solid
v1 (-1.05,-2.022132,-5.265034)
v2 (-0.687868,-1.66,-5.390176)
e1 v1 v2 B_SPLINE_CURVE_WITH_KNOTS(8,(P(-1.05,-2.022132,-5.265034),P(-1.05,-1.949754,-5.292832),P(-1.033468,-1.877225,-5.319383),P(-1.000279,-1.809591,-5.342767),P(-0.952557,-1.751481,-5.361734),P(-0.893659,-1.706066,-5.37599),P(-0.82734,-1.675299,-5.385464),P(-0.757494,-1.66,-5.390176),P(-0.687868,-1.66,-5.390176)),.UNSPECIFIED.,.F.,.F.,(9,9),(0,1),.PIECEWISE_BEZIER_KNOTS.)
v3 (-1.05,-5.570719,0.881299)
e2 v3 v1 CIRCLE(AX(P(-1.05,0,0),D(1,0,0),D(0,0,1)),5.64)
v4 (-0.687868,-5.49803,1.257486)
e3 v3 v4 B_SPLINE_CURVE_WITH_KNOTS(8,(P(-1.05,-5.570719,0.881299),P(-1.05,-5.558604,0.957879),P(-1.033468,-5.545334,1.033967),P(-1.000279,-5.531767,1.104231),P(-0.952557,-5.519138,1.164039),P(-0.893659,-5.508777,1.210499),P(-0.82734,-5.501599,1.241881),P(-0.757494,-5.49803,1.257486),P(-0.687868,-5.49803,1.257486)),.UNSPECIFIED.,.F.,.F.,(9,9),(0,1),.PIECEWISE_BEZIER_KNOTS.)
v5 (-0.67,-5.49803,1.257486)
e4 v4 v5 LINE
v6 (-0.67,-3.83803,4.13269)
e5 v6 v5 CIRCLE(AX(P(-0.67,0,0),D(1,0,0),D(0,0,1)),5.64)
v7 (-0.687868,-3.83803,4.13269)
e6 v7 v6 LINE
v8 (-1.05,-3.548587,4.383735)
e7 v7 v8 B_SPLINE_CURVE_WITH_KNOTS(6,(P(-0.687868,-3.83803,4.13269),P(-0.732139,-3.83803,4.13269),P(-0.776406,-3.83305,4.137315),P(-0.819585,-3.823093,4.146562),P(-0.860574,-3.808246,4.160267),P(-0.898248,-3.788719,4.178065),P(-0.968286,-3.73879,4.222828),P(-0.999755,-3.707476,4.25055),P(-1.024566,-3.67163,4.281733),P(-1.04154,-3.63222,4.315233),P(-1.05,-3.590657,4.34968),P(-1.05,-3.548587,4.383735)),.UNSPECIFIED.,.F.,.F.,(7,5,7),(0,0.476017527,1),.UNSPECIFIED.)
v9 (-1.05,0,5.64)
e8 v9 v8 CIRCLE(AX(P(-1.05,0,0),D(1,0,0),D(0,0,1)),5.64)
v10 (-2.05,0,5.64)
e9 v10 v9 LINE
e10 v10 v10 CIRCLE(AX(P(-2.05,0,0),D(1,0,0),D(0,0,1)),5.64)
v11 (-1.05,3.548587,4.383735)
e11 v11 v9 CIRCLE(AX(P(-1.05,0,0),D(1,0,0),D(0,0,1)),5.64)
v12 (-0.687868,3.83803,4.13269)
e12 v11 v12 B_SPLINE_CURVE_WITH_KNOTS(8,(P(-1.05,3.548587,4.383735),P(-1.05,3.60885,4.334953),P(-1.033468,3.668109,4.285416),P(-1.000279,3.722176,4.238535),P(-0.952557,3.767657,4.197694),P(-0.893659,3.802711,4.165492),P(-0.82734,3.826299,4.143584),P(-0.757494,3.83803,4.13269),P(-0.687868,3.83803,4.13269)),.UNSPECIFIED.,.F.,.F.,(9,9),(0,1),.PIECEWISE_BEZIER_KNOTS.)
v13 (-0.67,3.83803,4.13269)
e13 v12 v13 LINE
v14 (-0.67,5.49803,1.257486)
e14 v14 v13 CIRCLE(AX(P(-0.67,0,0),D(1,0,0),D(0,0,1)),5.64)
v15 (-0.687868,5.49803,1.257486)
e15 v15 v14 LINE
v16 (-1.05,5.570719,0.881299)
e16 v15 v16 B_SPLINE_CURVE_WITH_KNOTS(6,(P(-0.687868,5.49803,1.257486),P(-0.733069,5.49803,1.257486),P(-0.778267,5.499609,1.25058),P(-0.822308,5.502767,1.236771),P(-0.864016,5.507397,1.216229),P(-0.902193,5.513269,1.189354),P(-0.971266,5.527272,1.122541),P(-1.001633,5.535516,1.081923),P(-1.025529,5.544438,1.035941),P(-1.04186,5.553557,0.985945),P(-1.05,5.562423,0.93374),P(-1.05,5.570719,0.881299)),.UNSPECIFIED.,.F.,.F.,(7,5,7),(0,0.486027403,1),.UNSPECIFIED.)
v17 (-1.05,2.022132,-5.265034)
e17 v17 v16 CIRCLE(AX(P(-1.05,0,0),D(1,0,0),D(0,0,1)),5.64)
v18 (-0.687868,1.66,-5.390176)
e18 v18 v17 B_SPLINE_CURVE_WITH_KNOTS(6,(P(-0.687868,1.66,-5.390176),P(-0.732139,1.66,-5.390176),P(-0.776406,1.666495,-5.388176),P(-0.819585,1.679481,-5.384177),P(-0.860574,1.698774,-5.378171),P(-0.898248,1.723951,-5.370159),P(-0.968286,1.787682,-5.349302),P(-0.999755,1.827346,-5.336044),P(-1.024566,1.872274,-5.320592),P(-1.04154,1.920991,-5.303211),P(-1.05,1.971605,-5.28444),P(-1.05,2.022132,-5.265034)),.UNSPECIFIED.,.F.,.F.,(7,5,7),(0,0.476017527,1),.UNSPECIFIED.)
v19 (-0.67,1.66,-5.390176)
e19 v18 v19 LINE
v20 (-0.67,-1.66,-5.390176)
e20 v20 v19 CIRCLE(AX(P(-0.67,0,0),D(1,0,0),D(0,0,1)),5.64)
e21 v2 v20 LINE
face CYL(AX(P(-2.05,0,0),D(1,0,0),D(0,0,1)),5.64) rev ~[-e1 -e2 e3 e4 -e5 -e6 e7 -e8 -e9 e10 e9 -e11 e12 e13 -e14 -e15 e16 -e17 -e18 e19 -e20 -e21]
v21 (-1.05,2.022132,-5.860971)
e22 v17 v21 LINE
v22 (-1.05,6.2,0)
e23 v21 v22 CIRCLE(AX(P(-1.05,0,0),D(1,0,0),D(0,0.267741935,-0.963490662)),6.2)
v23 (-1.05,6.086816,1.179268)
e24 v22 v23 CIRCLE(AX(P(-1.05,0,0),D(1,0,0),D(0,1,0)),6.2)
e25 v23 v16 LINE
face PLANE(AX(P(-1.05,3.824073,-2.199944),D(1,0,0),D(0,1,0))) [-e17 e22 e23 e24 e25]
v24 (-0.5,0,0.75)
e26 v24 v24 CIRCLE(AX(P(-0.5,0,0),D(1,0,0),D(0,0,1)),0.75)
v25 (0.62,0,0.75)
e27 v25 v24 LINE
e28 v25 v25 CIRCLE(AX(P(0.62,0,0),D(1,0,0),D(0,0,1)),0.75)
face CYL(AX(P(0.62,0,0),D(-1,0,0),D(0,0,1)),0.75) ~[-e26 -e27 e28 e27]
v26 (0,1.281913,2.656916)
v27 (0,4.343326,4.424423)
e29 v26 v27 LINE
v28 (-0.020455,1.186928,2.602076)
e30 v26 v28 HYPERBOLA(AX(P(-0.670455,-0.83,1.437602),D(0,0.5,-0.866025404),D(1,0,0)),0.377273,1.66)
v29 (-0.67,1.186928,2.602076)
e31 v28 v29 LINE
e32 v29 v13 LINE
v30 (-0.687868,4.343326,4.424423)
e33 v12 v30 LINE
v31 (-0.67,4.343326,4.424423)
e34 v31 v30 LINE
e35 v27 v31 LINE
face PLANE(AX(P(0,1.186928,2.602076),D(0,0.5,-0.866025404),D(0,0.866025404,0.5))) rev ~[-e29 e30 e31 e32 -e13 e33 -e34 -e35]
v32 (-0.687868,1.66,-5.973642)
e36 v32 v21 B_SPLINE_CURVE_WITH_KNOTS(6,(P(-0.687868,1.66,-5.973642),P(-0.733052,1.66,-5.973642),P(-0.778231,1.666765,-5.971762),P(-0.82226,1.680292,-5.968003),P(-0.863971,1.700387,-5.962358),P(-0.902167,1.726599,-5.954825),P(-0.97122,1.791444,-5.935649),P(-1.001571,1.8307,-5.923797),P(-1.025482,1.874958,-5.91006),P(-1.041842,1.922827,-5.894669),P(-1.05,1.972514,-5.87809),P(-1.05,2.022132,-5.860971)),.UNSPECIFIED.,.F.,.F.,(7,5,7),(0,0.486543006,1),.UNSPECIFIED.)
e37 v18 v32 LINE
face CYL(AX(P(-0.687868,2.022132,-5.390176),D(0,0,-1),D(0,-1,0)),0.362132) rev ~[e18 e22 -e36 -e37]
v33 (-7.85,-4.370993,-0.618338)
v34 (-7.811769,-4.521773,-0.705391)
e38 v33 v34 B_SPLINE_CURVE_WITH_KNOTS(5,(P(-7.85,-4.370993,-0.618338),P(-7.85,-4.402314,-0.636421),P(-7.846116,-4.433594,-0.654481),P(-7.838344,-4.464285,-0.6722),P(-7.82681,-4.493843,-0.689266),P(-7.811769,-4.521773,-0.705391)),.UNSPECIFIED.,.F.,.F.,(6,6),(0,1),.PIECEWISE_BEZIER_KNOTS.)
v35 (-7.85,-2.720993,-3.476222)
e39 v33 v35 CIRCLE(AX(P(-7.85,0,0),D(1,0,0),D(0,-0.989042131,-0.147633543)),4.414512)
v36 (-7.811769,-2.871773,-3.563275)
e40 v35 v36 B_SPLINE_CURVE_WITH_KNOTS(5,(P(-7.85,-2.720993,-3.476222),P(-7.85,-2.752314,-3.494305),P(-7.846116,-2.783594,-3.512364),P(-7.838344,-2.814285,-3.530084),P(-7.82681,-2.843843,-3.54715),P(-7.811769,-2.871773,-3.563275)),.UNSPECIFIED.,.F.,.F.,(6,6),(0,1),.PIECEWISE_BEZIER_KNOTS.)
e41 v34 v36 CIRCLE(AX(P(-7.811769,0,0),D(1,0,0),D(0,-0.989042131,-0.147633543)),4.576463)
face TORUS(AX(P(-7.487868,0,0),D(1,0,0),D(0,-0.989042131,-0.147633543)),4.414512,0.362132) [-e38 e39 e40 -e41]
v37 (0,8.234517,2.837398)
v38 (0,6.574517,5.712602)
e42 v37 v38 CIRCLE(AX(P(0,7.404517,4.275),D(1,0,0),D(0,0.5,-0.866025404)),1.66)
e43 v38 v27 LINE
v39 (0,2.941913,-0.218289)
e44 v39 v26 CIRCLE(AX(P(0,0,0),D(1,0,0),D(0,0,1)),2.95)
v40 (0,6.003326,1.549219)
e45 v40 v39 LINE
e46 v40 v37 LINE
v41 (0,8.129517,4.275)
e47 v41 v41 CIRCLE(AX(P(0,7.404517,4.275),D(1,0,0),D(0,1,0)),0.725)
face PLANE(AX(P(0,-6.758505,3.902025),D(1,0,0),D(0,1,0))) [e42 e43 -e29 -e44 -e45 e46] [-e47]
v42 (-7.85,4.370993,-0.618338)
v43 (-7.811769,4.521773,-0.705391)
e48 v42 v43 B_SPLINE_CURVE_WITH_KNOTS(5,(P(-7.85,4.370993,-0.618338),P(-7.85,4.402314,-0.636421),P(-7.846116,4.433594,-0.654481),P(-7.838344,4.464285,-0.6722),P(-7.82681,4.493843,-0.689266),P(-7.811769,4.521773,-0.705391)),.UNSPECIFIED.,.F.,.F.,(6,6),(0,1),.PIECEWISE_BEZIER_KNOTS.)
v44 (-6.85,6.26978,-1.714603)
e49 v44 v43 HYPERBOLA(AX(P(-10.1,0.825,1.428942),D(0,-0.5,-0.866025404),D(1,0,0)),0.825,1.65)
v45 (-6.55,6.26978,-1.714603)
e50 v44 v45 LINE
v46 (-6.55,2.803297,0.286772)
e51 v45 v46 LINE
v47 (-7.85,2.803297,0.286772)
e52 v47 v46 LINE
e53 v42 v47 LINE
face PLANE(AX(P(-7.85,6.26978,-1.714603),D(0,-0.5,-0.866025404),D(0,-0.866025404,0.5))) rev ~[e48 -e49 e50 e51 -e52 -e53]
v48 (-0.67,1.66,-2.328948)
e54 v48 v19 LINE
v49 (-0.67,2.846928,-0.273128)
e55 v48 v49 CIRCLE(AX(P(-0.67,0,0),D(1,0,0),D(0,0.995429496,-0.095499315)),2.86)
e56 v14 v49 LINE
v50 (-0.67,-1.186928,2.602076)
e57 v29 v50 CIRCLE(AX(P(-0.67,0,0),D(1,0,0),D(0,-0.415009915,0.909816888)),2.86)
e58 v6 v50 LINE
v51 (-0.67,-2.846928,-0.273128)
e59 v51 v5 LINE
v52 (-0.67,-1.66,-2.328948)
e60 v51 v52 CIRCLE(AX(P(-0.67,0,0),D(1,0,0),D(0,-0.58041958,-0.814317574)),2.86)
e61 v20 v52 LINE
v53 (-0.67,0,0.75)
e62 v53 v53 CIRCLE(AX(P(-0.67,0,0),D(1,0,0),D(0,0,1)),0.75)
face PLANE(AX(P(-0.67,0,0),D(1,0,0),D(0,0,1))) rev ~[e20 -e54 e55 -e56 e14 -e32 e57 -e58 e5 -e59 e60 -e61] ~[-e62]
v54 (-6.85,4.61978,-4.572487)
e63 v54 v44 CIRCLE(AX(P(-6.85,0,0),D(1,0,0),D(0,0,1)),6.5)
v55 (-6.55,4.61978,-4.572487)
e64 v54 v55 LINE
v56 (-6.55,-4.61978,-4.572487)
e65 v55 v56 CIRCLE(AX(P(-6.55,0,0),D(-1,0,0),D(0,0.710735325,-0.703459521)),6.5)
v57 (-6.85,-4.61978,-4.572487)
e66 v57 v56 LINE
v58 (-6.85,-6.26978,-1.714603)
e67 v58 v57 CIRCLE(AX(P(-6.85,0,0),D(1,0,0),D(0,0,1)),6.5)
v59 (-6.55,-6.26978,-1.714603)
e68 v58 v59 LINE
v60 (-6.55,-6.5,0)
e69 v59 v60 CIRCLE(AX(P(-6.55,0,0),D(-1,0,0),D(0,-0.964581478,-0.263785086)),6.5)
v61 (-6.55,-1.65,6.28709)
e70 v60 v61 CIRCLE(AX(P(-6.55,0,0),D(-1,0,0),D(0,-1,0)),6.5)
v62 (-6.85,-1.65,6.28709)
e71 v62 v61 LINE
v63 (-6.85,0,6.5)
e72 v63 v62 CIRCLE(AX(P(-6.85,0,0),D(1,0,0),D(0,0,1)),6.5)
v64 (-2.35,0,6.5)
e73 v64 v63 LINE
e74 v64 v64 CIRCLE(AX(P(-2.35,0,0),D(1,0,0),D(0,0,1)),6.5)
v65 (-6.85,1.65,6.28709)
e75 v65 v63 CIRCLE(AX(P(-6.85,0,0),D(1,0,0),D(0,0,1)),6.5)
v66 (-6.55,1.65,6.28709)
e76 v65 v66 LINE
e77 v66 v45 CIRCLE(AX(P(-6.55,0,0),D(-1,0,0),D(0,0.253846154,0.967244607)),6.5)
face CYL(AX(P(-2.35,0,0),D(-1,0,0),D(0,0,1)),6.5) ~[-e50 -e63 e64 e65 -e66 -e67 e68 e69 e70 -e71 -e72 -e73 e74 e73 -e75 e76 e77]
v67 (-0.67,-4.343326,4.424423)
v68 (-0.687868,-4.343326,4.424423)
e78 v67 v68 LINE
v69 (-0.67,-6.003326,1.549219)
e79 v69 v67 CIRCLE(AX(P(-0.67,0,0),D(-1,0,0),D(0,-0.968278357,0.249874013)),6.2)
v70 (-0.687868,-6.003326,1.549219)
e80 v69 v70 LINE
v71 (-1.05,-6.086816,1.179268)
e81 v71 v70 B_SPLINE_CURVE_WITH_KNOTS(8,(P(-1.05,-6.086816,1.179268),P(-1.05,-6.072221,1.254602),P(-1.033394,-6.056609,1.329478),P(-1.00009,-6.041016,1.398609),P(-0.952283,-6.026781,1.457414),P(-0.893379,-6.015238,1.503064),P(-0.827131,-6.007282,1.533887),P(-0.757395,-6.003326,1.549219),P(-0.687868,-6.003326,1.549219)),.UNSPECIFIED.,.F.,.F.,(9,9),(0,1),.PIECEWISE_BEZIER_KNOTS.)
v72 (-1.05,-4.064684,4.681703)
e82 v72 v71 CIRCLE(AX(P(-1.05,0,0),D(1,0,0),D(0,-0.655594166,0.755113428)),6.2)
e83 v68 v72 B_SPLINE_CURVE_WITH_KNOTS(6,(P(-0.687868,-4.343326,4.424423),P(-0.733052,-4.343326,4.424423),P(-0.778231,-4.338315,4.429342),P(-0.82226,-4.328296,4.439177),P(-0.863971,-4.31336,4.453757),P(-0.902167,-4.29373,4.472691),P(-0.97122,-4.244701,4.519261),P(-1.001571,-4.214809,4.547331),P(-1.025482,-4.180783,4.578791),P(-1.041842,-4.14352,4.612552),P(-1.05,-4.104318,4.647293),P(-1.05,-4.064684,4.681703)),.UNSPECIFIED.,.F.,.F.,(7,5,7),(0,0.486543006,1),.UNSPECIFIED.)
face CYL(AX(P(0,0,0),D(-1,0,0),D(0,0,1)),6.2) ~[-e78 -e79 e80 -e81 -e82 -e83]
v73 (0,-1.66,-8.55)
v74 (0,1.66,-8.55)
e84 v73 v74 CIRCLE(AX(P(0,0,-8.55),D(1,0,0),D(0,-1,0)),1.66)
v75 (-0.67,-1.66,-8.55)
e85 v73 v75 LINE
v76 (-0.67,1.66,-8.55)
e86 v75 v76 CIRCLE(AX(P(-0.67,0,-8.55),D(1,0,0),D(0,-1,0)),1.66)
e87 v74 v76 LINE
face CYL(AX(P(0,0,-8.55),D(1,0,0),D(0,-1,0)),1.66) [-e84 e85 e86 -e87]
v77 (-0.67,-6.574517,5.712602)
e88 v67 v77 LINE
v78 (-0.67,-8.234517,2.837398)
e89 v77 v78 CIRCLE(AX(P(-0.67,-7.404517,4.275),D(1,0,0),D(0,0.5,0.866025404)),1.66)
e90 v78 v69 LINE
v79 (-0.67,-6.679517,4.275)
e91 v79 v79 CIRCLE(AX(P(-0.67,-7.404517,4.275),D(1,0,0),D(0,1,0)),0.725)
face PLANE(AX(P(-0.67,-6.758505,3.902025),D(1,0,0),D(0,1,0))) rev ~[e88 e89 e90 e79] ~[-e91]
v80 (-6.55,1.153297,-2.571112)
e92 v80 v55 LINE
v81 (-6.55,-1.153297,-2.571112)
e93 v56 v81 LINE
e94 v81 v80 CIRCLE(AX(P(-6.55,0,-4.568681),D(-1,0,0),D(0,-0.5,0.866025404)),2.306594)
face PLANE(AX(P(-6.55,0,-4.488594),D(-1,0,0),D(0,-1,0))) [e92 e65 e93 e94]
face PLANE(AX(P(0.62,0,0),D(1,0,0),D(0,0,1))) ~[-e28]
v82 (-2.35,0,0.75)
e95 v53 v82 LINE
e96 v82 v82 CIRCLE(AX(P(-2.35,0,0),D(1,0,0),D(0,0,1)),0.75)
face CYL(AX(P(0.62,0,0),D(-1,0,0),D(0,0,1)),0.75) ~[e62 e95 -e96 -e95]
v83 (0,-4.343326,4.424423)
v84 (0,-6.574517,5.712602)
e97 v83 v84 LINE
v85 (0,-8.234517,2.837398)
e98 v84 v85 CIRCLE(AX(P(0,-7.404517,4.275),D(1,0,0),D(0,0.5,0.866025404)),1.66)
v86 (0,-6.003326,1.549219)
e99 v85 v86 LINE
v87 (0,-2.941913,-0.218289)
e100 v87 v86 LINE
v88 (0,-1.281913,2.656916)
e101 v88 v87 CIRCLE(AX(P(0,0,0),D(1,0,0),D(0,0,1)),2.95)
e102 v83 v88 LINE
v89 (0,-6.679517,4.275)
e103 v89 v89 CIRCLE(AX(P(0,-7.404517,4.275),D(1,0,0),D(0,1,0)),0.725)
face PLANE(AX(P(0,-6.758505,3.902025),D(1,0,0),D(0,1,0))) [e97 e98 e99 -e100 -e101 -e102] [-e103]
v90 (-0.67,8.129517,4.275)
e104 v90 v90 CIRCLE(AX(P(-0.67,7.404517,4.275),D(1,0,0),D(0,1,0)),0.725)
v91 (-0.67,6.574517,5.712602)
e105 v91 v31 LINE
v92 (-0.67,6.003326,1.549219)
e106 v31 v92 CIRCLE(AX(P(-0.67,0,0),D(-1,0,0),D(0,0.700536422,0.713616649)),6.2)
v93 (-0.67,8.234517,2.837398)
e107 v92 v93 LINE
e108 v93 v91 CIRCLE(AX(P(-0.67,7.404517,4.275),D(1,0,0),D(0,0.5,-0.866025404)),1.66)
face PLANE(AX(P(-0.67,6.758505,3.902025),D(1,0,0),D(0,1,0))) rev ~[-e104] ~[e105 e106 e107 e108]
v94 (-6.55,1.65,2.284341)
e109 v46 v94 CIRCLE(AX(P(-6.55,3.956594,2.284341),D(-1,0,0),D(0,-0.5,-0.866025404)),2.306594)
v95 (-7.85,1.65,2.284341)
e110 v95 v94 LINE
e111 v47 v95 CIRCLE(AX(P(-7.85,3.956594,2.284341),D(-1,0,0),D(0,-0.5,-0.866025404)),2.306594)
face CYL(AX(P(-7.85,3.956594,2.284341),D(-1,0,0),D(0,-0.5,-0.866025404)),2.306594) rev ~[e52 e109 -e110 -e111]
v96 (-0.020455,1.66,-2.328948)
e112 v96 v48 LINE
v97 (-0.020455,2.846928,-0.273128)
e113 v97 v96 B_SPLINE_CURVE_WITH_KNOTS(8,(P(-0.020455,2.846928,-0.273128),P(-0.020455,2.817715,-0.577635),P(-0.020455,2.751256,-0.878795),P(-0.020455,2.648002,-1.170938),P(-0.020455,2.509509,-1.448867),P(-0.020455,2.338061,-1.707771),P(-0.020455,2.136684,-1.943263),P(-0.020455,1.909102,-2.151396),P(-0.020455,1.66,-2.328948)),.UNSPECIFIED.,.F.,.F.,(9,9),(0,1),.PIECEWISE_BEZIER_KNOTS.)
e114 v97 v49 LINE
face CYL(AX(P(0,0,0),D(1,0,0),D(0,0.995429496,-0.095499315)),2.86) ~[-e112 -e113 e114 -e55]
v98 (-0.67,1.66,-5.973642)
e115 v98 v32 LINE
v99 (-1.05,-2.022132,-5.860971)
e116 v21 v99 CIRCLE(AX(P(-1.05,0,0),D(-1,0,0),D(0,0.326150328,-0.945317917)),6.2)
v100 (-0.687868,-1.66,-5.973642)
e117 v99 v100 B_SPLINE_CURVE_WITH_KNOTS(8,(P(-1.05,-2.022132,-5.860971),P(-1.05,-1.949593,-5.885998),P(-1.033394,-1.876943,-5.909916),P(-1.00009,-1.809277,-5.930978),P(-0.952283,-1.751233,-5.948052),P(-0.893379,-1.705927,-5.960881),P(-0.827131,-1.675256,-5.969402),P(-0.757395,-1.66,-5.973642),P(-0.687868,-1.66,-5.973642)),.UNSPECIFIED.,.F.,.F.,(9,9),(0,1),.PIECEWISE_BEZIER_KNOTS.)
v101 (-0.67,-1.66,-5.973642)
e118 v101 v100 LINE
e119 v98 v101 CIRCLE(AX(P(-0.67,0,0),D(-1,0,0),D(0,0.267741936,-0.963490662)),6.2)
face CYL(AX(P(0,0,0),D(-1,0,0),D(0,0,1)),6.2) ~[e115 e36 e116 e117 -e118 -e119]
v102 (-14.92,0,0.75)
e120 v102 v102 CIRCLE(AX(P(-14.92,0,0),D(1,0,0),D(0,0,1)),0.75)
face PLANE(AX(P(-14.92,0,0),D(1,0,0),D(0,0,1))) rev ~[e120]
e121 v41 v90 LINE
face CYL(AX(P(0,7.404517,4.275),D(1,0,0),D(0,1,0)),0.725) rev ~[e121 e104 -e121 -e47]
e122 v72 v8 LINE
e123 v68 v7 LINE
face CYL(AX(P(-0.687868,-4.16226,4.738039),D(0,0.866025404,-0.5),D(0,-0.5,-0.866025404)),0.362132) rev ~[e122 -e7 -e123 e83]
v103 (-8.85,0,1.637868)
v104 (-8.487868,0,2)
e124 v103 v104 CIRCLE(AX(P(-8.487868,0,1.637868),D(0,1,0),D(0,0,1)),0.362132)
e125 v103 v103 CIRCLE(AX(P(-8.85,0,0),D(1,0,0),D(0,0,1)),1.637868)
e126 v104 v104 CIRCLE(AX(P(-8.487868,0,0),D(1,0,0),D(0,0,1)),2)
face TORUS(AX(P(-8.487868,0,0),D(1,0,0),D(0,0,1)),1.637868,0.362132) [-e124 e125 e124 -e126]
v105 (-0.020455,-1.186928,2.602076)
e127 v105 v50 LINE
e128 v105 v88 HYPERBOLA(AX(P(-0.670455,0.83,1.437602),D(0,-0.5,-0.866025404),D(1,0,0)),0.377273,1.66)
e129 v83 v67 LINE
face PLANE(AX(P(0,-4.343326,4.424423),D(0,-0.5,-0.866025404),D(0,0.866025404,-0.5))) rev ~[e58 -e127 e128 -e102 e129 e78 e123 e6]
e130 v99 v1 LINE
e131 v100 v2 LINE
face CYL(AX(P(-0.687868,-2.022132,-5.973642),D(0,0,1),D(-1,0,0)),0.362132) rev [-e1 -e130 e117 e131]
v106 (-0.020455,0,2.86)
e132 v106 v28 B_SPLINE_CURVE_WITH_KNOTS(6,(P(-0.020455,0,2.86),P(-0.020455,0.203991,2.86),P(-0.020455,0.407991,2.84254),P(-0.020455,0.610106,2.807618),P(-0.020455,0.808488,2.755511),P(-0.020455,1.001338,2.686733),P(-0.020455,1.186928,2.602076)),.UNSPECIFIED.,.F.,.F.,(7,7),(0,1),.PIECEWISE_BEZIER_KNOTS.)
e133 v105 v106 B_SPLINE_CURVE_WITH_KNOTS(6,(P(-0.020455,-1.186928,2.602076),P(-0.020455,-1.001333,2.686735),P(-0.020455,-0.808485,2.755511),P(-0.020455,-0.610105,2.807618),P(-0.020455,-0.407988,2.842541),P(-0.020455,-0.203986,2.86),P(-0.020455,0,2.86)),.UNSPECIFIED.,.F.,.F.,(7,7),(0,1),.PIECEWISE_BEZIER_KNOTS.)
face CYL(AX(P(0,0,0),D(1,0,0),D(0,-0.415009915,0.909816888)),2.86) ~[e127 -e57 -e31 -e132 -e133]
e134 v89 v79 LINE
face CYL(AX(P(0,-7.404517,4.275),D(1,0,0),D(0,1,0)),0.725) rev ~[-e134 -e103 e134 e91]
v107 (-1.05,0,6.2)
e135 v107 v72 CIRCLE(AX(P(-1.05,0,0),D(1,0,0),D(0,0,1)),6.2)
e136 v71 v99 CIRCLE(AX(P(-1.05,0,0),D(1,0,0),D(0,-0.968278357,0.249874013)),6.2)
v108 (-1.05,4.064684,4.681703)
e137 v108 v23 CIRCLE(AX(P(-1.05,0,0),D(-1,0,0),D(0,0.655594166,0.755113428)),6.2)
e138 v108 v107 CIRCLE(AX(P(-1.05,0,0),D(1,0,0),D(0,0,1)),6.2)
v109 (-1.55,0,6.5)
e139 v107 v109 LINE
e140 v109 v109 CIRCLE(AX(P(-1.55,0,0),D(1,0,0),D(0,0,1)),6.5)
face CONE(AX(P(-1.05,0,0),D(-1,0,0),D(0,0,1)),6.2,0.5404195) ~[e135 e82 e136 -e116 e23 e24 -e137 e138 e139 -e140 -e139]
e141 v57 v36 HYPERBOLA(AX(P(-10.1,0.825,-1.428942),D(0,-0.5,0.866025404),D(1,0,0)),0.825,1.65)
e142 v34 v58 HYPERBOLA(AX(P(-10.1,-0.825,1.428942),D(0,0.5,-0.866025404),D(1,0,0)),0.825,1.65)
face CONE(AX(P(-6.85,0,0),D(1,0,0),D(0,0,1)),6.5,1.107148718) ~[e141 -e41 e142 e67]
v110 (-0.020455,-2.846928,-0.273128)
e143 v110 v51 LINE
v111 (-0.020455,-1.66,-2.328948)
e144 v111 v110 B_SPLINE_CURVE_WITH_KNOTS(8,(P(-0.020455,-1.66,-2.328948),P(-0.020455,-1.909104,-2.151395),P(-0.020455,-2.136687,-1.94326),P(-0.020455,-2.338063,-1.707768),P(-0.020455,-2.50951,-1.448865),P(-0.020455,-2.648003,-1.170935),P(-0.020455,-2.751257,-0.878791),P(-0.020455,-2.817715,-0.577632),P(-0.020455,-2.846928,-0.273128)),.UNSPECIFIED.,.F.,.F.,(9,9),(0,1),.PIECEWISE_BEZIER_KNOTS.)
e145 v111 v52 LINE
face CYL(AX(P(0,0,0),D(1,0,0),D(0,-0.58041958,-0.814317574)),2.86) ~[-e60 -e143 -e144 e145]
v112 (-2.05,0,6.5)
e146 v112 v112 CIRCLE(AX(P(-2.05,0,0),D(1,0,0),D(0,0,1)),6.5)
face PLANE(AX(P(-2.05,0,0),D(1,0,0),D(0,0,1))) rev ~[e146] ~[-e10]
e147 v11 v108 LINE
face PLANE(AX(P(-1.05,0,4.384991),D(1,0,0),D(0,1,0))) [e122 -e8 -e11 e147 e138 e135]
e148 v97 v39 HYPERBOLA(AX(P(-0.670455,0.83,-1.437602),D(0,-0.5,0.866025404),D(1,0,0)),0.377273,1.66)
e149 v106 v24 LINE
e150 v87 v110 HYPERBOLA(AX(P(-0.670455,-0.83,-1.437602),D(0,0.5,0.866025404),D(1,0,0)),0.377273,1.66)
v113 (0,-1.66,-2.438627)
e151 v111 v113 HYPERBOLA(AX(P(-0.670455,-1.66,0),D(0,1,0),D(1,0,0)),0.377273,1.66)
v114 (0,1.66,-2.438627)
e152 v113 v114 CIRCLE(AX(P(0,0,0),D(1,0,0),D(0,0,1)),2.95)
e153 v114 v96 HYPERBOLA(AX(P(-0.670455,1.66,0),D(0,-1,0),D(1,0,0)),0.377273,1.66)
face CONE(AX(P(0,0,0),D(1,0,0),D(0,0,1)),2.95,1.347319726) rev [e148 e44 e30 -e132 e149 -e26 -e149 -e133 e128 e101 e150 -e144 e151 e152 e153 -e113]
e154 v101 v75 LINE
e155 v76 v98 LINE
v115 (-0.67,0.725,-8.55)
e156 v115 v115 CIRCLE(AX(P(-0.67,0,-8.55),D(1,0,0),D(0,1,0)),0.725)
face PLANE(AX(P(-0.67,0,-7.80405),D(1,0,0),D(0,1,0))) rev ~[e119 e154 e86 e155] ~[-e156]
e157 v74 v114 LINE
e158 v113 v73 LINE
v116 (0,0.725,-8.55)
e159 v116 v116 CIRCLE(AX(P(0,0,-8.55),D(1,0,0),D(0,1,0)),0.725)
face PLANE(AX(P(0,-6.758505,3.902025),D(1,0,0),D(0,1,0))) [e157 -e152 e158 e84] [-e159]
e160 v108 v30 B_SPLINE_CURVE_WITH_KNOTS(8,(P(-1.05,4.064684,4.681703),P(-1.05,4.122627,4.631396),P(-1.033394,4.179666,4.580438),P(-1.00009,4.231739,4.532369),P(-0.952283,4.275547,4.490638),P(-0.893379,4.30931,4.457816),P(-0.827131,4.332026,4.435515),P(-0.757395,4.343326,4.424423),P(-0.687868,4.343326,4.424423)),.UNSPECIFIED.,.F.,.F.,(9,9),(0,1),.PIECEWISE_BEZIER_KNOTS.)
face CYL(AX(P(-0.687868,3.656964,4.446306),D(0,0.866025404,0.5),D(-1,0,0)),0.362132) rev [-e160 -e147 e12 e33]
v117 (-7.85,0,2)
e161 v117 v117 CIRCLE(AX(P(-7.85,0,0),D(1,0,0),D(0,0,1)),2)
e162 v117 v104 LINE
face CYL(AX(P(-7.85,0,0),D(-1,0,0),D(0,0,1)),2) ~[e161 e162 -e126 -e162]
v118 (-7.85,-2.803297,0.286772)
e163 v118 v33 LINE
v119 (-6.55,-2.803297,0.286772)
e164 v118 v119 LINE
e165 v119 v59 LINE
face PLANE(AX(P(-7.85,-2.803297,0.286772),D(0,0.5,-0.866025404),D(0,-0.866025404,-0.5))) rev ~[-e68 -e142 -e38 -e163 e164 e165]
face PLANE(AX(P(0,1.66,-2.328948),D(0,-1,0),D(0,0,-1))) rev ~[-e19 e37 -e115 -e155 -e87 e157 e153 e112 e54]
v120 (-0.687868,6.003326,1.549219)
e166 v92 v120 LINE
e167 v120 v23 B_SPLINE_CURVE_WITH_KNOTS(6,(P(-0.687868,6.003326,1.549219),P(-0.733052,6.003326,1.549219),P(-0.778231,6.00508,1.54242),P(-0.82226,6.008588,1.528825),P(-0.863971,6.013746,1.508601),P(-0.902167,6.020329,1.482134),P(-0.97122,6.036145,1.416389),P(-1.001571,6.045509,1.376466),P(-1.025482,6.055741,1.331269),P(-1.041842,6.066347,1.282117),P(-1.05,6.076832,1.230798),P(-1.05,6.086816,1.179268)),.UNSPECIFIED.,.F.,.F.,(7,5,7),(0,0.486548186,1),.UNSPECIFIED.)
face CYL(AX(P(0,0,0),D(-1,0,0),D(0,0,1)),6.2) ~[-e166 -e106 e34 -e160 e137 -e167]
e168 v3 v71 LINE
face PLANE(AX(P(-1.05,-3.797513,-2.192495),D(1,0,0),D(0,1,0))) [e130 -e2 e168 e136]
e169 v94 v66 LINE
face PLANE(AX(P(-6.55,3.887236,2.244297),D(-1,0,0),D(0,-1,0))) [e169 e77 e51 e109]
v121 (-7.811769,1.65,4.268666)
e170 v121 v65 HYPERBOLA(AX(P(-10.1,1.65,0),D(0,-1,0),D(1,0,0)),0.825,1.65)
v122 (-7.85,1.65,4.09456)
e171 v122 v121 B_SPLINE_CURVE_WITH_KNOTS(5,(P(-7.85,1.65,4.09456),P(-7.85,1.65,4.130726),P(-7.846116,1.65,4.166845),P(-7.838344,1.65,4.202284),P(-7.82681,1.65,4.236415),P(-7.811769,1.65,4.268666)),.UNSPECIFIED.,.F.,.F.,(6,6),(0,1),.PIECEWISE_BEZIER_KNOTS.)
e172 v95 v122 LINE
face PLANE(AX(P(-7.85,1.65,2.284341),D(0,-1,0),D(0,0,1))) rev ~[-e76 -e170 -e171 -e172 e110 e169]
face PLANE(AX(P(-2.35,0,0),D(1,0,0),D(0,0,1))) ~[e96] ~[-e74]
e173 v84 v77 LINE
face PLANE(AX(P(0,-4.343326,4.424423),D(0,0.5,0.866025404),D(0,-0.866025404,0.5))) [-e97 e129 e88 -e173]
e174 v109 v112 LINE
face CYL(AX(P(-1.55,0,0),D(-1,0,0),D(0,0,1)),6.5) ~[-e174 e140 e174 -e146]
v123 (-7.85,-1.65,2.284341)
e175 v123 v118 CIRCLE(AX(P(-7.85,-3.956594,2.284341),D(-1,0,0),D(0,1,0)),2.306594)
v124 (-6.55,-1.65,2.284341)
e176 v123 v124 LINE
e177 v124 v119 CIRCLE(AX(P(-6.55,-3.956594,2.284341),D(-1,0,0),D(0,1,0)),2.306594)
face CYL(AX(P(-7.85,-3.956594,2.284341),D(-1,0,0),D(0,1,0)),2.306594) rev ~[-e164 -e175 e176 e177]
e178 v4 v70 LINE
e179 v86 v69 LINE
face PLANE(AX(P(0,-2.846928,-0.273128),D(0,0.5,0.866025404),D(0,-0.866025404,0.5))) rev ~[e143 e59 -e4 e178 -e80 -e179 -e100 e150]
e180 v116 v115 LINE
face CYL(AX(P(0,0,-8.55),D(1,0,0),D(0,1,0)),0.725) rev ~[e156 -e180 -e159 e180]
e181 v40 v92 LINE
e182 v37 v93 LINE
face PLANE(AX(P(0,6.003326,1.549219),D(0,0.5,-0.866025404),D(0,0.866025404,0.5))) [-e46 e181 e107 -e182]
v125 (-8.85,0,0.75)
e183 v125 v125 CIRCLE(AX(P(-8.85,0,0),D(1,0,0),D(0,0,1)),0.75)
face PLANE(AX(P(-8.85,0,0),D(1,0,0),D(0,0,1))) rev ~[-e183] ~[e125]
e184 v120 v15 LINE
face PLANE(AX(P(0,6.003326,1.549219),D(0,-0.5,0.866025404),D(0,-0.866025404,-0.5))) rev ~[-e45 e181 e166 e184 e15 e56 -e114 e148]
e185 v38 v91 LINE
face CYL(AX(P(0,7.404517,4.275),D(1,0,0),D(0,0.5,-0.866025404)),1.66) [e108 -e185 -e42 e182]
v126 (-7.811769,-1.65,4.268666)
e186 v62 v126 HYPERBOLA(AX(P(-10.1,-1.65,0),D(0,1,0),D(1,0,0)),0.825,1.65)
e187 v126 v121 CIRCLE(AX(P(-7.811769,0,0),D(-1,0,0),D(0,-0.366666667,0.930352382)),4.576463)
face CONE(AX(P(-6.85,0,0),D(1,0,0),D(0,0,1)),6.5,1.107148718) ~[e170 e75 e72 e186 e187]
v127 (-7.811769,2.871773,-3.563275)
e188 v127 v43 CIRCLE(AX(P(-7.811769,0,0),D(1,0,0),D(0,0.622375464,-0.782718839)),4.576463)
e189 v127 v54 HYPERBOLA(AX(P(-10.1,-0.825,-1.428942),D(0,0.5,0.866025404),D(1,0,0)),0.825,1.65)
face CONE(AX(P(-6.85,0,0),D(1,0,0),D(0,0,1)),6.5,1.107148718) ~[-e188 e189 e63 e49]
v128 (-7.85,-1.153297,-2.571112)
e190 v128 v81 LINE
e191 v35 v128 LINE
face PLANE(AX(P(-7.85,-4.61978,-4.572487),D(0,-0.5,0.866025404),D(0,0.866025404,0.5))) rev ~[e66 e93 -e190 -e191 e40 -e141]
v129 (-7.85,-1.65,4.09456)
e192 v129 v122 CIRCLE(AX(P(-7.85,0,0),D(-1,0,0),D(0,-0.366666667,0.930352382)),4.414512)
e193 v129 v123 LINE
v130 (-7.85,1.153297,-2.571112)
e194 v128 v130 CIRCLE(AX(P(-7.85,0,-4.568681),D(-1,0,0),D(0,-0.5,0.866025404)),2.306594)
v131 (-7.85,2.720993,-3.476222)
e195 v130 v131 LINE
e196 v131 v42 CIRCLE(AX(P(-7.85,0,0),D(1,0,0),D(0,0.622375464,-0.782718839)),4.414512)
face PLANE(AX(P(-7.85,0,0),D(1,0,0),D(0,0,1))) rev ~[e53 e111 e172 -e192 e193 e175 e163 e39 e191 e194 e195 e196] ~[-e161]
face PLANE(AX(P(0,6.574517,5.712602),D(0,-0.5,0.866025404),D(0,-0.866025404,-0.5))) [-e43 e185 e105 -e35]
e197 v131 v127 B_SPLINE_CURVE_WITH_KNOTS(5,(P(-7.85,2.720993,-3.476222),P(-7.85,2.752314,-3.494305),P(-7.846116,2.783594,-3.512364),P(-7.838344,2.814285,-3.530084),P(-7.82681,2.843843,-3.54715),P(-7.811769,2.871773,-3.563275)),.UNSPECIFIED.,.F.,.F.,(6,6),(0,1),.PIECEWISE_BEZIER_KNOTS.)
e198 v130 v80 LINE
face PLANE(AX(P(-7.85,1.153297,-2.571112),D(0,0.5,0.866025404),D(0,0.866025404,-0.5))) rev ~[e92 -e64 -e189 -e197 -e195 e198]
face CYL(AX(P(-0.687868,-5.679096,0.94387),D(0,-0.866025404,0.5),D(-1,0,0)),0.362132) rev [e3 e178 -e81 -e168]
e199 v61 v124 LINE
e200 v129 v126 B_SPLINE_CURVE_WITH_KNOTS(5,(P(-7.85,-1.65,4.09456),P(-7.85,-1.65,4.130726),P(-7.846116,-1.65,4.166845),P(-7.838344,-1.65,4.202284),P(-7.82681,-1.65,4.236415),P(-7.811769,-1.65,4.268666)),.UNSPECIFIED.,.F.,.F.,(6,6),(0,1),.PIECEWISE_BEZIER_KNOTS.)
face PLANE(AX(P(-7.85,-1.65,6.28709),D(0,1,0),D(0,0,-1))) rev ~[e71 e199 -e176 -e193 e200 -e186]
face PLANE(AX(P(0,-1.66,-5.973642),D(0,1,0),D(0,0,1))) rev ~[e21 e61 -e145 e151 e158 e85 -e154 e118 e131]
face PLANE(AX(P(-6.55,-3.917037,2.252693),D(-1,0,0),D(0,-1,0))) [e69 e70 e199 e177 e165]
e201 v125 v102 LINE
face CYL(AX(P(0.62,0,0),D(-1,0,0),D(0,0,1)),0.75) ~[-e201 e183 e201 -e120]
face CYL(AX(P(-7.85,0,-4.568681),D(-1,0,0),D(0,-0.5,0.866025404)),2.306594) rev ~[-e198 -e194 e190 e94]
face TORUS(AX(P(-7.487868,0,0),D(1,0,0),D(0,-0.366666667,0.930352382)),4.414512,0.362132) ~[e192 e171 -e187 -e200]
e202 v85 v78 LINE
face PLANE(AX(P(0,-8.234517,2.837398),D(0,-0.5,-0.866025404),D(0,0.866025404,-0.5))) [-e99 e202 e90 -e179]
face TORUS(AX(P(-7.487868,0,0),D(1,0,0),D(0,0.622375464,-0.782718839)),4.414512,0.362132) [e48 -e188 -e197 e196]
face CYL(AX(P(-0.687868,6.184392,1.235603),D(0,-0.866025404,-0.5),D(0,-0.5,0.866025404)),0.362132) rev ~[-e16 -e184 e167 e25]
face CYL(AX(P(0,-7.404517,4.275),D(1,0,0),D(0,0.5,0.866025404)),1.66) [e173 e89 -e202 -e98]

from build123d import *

# Parameters (mm, degrees)
F4_DEPTH = 1.3
F6_DEPTH = 1.05
F5_R     = 0.725
F7_DEPTH = 0.67
F8_R     = 0.3621320344
F8_2_R   = 0.3621320344


# Not quite as in the source:
# - a fillet or chamfer that OpenCascade refuses, or shapes differently, is made with other operations: its cross-section is extruded or revolved along the edge and cut away or added


with BuildPart() as f1:
    # F0 (on Front) → F1 (revolve)
    with BuildSketch(Plane.XZ):
        Polygon((-8.85, 2), (-8.85, 0.75), (-2.35, 0.75), (-2.35, 6.5), (-7.85, 6.5), (-7.85, 2), align=None)
    revolve(axis=Axis((6.5496404592, 0, 0), (1, 0, 0)))

    # F3: chamfer of 2 x 1 on 1 edges, made by hand

    # F3_s1 → F3_t2 (revolve, cut)
    with BuildSketch(Plane.XZ):
        Polygon((-6.85, 6.5), (-7.85, 4.5), (-7.85, 6.5), align=None)
    revolve(axis=Axis((-7.85, 0, 0), (1, 0, 0)), mode=Mode.SUBTRACT)

    # F2 (on face) → F4 (cut)
    with BuildSketch(Plane(origin=(-7.85, 0, 0), x_dir=(0, -1, 0), z_dir=(-1, 0, 0))):
        with BuildLine():
            Line((-1.65, 2.2843407316), (-1.65, 6.2870899469))
            ThreePointArc((-1.65, 6.2870899469), (-5.6291651246, 3.25), (-6.2697796099, -1.7146030572))
            Line((-6.2697796099, -1.7146030572), (-2.8032971045, 0.2867715504))
            ThreePointArc((-2.8032971045, 0.2867715504), (-1.9590250278, 1.1310436271), (-1.65, 2.2843407316))
        make_face()
        with BuildLine():
            ThreePointArc((6.5, 0), (5.14660082, 3.9702015062), (1.65, 6.2870899469))
            Line((1.65, 6.2870899469), (1.65, 2.2843407316))
            ThreePointArc((1.65, 2.2843407316), (1.9590250278, 1.1310436271), (2.8032971045, 0.2867715504))
            Line((2.8032971045, 0.2867715504), (6.2697796099, -1.7146030572))
            ThreePointArc((6.2697796099, -1.7146030572), (6.4421878063, -0.8649949526), (6.5, 0))
        make_face()
        with BuildLine():
            Line((-1.1532971045, -2.571112282), (-4.6197796099, -4.5724868897))
            ThreePointArc((-4.6197796099, -4.5724868897), (0, -6.5), (4.6197796099, -4.5724868897))
            Line((4.6197796099, -4.5724868897), (1.1532971045, -2.571112282))
            ThreePointArc((1.1532971045, -2.571112282), (0, -2.2620872543), (-1.1532971045, -2.571112282))
        make_face()
    extrude(amount=-F4_DEPTH, mode=Mode.SUBTRACT)

    # F8
    f8_edges = [f1.edges().sort_by_distance(p)[0] for p in [
        (-7.85, 0, 4.5),
        (-7.85, 3.897114, -2.25),
        (-7.85, -3.897114, -2.25),
        (-8.85, 0, -2),
    ]]
    fillet(f8_edges, radius=F8_R)



with BuildPart() as f1b:
    # F0 (on Front) → F1, piece 2 (revolve)
    with BuildSketch(Plane.XZ):
        Polygon((-0.67, 0.75), (0, 0.75), (0, 6.2), (-1.05, 6.2), (-1.55, 6.5), (-2.05, 6.5), (-2.05, 5.64), (-0.67, 5.64), align=None)
    revolve(axis=Axis((6.5496404592, 0, 0), (1, 0, 0)))

    # F5 (on face) → F6 (cut)
    with BuildSketch(Plane.YZ):
        with BuildLine():
            ThreePointArc((4.3433258161, 4.4244232228), (0, 6.2), (-4.3433258161, 4.4244232228))
            Line((-4.3433258161, 4.4244232228), (-1.1869283577, 2.6020763005))
            ThreePointArc((-1.1869283577, 2.6020763005), (0, 2.86), (1.1869283577, 2.6020763005))
            Line((1.1869283577, 2.6020763005), (4.3433258161, 4.4244232228))
        make_face()
        with BuildLine():
            Line((1.66, -2.3289482605), (1.66, -5.9736421051))
            ThreePointArc((1.66, -5.9736421051), (4.936192865, -3.75153302), (6.2, 0))
            ThreePointArc((6.2, 0), (6.150634929, 0.780826466), (6.0033258161, 1.5492188823))
            Line((6.0033258161, 1.5492188823), (2.8469283577, -0.27312804))
            ThreePointArc((2.8469283577, -0.27312804), (2.4768326548, -1.43), (1.66, -2.3289482605))
        make_face()
        with BuildLine():
            ThreePointArc((-6.0033258161, 1.5492188823), (-5.3693575035, -3.1), (-1.66, -5.9736421051))
            Line((-1.66, -5.9736421051), (-1.66, -2.3289482605))
            ThreePointArc((-1.66, -2.3289482605), (-2.4768326548, -1.43), (-2.8469283577, -0.27312804))
            Line((-2.8469283577, -0.27312804), (-6.0033258161, 1.5492188823))
        make_face()
    extrude(amount=-F6_DEPTH, mode=Mode.SUBTRACT)

    # F5 (on face) → F7 (join)
    with BuildSketch(Plane.YZ):
        with BuildLine():
            Line((-8.2345172024, 2.8373978297), (-6.0033258161, 1.5492188823))
            ThreePointArc((-6.0033258161, 1.5492188823), (-5.3693575035, 3.1), (-4.3433258161, 4.4244232228))
            Line((-4.3433258161, 4.4244232228), (-6.5745172024, 5.7126021703))
            ThreePointArc((-6.5745172024, 5.7126021703), (-8.8421193726, 5.105), (-8.2345172024, 2.8373978297))
        make_face()
        with Locations((-7.4045172024, 4.275)):
            Circle(F5_R, mode=Mode.SUBTRACT)
        with BuildLine():
            ThreePointArc((4.3433258161, 4.4244232228), (5.3693575035, 3.1), (6.0033258161, 1.5492188823))
            Line((6.0033258161, 1.5492188823), (8.2345172024, 2.8373978297))
            ThreePointArc((8.2345172024, 2.8373978297), (8.8421193726, 5.105), (6.5745172024, 5.7126021703))
            Line((6.5745172024, 5.7126021703), (4.3433258161, 4.4244232228))
        make_face()
        with Locations((7.4045172024, 4.275)):
            Circle(F5_R, mode=Mode.SUBTRACT)
        with BuildLine():
            Line((1.66, -8.55), (1.66, -5.9736421051))
            ThreePointArc((1.66, -5.9736421051), (0, -6.2), (-1.66, -5.9736421051))
            Line((-1.66, -5.9736421051), (-1.66, -8.55))
            ThreePointArc((-1.66, -8.55), (0, -10.21), (1.66, -8.55))
        make_face()
        with Locations((0, -8.55)):
            Circle(F5_R, mode=Mode.SUBTRACT)
    extrude(amount=-F7_DEPTH)

    # F8#2
    f8_2_edges = [f1b.edges().sort_by_distance(p)[0] for p in [
        (-1.05, -5.750678, 1.403352),
        (-1.05, -4.090678, 4.278557),
        (-1.05, 4.090678, 4.278557),
        (-1.05, 5.750678, 1.403352),
        (-1.05, 1.66, -5.681909),
        (-1.05, -1.66, -5.681909),
    ]]
    fillet(f8_2_edges, radius=F8_2_R)

    # F9: chamfer of 2.2 x 0.5 on 1 edges, made by hand

    # F9_s1 → F9_t2 (revolve, cut)
    with BuildSketch(Plane.XZ):
        Polygon((0, 2.95), (-0.5, 0.75), (0, 0.75), align=None)
    revolve(axis=Axis((0, 0, 0), (1, 0, 0)), mode=Mode.SUBTRACT)


with BuildPart() as f1_1:
    add(f1.part)

    add(f1b.part)  # F10 merges F1b
    # F0 (on Front) → F10 (revolve)
    with BuildSketch(Plane.XZ):
        Polygon((-14.92, 0.75), (-14.92, 0), (0.62, 0), (0.62, 0.75), (0, 0.75), (-0.67, 0.75), (-2.35, 0.75), (-8.85, 0.75), align=None)
    revolve(axis=Axis((6.5496404592, 0, 0), (1, 0, 0)))


solid = f1_1.part
